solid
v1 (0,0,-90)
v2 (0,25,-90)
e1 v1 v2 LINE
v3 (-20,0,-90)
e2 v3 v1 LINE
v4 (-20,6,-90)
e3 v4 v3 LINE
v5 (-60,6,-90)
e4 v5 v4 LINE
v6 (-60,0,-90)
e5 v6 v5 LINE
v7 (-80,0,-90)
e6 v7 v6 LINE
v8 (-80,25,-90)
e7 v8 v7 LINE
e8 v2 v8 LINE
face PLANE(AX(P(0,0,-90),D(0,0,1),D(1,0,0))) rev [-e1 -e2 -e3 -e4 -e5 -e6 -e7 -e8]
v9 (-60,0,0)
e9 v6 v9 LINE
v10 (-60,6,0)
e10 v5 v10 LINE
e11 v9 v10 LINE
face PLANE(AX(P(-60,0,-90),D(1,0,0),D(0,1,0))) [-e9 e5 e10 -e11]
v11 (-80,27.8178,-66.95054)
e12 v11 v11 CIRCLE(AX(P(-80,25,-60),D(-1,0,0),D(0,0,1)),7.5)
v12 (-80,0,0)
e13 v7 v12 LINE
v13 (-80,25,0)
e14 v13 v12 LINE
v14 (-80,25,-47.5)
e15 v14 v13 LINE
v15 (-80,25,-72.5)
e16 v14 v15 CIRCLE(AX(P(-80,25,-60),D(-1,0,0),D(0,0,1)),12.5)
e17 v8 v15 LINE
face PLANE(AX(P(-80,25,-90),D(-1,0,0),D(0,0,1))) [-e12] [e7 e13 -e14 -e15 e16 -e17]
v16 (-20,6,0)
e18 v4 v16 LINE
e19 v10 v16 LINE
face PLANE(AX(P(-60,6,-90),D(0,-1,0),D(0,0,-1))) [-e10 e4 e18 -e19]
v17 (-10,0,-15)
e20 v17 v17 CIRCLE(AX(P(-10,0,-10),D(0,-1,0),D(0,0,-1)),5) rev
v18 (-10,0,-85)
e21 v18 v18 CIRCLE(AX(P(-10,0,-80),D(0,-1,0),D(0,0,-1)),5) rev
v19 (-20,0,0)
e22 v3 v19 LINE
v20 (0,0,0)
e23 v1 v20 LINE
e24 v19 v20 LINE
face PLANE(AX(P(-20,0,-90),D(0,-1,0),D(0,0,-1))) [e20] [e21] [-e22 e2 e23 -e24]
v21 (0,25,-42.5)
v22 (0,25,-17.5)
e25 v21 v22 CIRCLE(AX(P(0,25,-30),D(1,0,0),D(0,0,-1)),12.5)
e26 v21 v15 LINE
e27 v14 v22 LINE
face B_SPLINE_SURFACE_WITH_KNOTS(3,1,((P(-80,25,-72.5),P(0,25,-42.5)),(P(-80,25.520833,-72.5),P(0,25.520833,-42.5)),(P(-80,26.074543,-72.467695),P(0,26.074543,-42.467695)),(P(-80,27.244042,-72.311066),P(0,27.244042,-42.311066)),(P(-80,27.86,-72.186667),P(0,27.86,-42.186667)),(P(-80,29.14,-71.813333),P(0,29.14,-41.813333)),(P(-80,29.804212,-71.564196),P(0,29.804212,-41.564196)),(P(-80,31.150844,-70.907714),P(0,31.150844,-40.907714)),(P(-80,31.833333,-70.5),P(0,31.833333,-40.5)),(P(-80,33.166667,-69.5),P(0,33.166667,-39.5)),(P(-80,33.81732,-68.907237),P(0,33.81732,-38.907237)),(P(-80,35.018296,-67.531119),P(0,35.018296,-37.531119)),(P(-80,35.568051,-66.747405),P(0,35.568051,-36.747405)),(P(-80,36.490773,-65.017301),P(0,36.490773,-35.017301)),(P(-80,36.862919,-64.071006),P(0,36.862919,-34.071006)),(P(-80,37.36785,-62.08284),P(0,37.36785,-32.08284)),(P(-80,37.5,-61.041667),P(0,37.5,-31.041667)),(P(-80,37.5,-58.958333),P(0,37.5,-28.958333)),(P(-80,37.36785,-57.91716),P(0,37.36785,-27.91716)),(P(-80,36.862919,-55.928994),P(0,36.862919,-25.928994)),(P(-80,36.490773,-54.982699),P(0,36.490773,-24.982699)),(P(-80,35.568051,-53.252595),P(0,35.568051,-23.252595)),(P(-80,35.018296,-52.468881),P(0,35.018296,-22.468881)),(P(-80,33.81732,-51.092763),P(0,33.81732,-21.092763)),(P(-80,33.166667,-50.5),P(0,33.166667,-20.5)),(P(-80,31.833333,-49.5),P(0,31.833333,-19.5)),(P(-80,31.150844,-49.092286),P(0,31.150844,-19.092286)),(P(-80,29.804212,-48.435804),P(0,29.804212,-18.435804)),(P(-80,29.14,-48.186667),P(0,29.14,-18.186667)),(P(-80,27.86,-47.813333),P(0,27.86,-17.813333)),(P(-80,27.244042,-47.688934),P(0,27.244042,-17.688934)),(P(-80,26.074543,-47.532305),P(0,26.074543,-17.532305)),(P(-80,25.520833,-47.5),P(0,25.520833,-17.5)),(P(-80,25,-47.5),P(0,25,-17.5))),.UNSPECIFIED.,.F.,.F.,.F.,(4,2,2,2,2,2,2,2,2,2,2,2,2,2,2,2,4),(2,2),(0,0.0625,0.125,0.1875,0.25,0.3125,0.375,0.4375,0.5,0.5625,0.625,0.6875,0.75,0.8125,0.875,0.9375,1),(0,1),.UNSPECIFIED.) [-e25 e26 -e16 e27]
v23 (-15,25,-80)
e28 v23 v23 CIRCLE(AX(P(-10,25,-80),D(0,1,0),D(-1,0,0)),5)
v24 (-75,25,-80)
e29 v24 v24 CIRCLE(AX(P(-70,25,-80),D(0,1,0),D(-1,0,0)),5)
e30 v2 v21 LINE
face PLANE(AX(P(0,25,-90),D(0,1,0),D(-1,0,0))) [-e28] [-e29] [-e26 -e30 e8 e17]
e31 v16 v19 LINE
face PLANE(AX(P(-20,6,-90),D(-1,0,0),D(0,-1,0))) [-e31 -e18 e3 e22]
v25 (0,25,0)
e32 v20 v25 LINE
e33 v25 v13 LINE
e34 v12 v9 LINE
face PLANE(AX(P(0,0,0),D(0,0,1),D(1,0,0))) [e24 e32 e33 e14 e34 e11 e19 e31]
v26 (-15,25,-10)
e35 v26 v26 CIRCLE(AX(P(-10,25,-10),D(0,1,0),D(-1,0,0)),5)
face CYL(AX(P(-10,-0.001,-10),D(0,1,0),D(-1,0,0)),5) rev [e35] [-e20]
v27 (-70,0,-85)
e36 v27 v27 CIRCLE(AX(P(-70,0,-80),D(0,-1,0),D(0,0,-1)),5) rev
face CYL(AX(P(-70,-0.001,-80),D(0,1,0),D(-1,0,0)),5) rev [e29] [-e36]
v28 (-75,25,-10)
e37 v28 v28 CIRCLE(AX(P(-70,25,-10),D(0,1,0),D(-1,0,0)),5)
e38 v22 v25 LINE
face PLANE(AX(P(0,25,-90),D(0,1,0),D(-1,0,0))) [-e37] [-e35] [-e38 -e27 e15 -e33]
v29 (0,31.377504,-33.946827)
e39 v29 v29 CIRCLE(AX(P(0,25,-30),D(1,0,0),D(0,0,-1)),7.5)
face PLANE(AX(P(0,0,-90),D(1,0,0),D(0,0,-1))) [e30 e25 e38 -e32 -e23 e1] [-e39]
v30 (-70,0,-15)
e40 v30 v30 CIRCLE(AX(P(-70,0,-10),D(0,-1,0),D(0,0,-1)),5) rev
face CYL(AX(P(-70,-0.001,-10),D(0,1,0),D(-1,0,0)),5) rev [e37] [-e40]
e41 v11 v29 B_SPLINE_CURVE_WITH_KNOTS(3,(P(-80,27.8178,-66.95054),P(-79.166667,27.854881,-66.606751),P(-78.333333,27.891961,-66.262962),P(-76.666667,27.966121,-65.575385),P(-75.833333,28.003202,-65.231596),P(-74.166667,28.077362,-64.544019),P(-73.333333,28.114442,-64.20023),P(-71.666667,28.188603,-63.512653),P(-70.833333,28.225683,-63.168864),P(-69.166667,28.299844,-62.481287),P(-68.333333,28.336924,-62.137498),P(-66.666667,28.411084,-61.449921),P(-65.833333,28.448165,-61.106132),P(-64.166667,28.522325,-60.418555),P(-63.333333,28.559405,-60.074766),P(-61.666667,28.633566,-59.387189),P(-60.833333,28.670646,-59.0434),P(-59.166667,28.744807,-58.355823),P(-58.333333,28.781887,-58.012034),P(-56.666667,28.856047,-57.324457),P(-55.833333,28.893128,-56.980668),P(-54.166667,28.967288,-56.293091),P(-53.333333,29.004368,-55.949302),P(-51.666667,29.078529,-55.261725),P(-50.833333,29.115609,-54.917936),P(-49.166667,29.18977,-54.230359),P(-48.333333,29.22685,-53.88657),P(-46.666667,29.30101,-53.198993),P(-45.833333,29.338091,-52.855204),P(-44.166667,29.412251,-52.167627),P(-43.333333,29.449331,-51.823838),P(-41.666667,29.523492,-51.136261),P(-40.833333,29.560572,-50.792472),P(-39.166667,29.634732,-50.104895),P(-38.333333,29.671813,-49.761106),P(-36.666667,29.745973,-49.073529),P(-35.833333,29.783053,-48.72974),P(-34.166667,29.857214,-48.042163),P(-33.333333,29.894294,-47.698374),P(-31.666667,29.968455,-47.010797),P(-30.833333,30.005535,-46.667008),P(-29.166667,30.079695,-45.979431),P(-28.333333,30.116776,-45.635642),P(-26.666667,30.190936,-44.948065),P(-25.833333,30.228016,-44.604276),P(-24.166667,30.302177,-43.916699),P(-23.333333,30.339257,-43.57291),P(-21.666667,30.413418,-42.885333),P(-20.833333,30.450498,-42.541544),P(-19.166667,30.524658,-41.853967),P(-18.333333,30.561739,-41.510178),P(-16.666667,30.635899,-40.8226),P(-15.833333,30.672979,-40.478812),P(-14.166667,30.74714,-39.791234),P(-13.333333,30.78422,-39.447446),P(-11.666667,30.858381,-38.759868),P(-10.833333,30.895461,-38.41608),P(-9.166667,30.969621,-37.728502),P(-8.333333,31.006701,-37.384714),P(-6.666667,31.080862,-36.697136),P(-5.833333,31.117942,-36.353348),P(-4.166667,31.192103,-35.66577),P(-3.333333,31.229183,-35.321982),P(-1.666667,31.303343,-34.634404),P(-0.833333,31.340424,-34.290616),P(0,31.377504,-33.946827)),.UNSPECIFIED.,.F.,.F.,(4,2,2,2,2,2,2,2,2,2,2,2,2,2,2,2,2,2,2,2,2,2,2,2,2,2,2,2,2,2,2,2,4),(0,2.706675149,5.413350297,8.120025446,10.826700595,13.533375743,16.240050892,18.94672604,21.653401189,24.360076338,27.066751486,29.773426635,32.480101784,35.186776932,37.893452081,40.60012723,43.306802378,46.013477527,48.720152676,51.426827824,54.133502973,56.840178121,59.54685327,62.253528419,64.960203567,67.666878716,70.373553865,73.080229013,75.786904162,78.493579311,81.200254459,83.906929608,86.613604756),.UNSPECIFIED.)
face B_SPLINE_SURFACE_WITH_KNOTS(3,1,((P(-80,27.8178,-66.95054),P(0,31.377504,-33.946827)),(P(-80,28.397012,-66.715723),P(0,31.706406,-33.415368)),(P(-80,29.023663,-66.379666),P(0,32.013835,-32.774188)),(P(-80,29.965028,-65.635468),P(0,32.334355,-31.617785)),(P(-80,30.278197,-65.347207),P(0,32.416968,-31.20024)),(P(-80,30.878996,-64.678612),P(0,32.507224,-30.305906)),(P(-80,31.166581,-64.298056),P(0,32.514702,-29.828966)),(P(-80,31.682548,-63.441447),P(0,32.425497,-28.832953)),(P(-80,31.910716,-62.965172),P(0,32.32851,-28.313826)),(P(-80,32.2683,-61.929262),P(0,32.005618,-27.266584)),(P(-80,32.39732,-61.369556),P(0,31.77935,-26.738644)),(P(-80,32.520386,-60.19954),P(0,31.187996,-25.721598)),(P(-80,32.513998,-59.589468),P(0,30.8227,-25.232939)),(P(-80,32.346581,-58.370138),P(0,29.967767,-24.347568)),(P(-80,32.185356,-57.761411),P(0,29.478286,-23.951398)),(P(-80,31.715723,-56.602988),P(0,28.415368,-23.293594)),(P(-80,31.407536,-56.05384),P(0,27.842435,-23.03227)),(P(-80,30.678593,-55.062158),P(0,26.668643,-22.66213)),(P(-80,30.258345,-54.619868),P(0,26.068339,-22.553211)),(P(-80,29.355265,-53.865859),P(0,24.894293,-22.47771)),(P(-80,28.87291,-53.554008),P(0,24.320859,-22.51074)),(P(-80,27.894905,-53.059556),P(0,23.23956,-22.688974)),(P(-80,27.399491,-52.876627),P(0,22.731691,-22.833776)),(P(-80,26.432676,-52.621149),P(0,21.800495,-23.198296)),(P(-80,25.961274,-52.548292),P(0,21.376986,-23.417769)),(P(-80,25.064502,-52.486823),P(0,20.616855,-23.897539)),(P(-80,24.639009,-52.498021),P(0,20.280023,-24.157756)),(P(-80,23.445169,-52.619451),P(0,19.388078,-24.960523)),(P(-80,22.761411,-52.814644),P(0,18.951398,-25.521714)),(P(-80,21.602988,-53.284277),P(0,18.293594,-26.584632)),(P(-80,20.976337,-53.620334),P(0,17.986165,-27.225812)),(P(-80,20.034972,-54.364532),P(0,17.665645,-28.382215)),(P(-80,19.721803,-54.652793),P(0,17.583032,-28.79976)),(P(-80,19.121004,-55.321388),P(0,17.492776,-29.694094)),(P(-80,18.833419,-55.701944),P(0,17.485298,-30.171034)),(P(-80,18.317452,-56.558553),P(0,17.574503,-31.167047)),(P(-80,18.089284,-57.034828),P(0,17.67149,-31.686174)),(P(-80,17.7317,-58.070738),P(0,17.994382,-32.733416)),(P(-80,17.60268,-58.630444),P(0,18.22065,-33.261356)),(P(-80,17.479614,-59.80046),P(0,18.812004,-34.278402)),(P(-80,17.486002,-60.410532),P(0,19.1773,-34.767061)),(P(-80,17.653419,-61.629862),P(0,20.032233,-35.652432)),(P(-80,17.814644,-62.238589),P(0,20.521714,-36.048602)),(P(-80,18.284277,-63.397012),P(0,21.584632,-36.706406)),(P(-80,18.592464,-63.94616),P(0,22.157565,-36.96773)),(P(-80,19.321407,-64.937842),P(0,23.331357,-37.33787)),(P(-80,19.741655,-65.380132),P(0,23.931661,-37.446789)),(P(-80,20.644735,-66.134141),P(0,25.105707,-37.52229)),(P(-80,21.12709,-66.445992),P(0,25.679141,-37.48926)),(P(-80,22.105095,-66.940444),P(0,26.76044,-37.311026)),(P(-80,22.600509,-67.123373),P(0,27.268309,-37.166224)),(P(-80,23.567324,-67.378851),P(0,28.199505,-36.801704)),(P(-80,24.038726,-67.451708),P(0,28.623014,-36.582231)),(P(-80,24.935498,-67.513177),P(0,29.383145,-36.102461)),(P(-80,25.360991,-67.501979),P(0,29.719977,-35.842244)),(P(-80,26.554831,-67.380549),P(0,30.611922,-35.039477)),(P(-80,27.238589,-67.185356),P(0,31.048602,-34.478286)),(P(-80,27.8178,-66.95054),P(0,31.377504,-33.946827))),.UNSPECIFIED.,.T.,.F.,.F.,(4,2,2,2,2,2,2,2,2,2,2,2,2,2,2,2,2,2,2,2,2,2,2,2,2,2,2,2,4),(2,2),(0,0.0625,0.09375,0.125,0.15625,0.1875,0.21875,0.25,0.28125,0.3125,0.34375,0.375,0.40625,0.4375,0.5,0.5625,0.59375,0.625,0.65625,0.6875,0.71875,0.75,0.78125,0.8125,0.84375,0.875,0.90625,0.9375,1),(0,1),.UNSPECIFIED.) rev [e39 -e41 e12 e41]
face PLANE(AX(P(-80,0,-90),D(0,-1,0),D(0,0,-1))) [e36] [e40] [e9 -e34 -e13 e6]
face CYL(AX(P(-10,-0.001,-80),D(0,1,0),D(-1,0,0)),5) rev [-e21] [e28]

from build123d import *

# Parameters (mm, degrees)
SALIENTE_EXTRUIR1_DEPTH = 90
CORTAR_EXTRUIR1_REACH   = 124.984
CROQUIS3_R              = 5


with BuildPart() as part:
    # Croquis2 → Saliente-Extruir1 (new body)
    with BuildSketch(Plane.XY):
        Polygon((0, 0), (0, 25), (-80, 25), (-80, 0), (-60, 0), (-60, 6), (-20, 6), (-20, 0), align=None)
    extrude(amount=-SALIENTE_EXTRUIR1_DEPTH)

    # Croquis3 → Cortar-Extruir1 (cut, up to next)
    with BuildSketch(Plane(origin=(0, 25, 0), x_dir=(1, 0, 0), z_dir=(0, 1, 0)), mode=Mode.PRIVATE) as cortar_extruir1_sk1:
        with Locations(Location((-70, 80, 0), (0, 0, 180))):
            Circle(CROQUIS3_R)
    cortar_extruir1_tool1 = extrude(cortar_extruir1_sk1.sketch, amount=-CORTAR_EXTRUIR1_REACH, mode=Mode.PRIVATE) & part.part
    # Croquis3 → Cortar-Extruir1 (cut, up to next)
    with BuildSketch(Plane(origin=(0, 25, 0), x_dir=(1, 0, 0), z_dir=(0, 1, 0)), mode=Mode.PRIVATE) as cortar_extruir1_sk2:
        with Locations(Location((-10, 80, 0), (0, 0, 180))):
            Circle(CROQUIS3_R)
    cortar_extruir1_tool2 = extrude(cortar_extruir1_sk2.sketch, amount=-CORTAR_EXTRUIR1_REACH, mode=Mode.PRIVATE) & part.part
    # Croquis3 → Cortar-Extruir1 (cut, up to next)
    with BuildSketch(Plane(origin=(0, 25, 0), x_dir=(1, 0, 0), z_dir=(0, 1, 0)), mode=Mode.PRIVATE) as cortar_extruir1_sk3:
        with Locations(Location((-10, 10, 0), (0, 0, 180))):
            Circle(CROQUIS3_R)
    cortar_extruir1_tool3 = extrude(cortar_extruir1_sk3.sketch, amount=-CORTAR_EXTRUIR1_REACH, mode=Mode.PRIVATE) & part.part
    # Croquis3 → Cortar-Extruir1 (cut, up to next)
    with BuildSketch(Plane(origin=(0, 25, 0), x_dir=(1, 0, 0), z_dir=(0, 1, 0)), mode=Mode.PRIVATE) as cortar_extruir1_sk4:
        with Locations(Location((-70, 10, 0), (0, 0, 180))):
            Circle(CROQUIS3_R)
    cortar_extruir1_tool4 = extrude(cortar_extruir1_sk4.sketch, amount=-CORTAR_EXTRUIR1_REACH, mode=Mode.PRIVATE) & part.part
    add(cortar_extruir1_tool1.solids().sort_by_distance((-70, 25, -80))[0], mode=Mode.SUBTRACT)
    add(cortar_extruir1_tool2.solids().sort_by_distance((-10, 25, -80))[0], mode=Mode.SUBTRACT)
    add(cortar_extruir1_tool3.solids().sort_by_distance((-10, 25, -10))[0], mode=Mode.SUBTRACT)
    add(cortar_extruir1_tool4.solids().sort_by_distance((-70, 25, -10))[0], mode=Mode.SUBTRACT)

    # Croquis5 → Recubrir1 section 0
    with BuildSketch(Plane.ZY.offset(80)):
        with BuildLine():
            Line((-72.5, 25), (-47.5, 25))
            ThreePointArc((-47.5, 25), (-60, 37.5), (-72.5, 25))
        make_face()
    # Croquis4 → Recubrir1 section 1
    with BuildSketch(Plane(origin=(0, 0, 0), x_dir=(0, 0, -1), z_dir=(1, 0, 0))):
        with BuildLine():
            Line((42.5, 25), (17.5, 25))
            ThreePointArc((17.5, 25), (30, 37.5), (42.5, 25))
        make_face()
    loft()

    # Cortar-Recubrir1: read off the stored shape, not the designer's step
    # Cortar-Recubrir1: loft between two sections, ruled curve by curve
    cortar_recubrir1_from = [
        Edge.make_bspline([(-80, 27.8178005, -66.950539572), (-80, 28.397012131, -66.715722864), (-80, 29.023662616, -66.379666069), (-80, 29.965028032, -65.63546774), (-80, 30.27819737, -65.347207423), (-80, 30.878995513, -64.678611595), (-80, 31.166580719, -64.298055634), (-80, 31.682547567, -63.441447082), (-80, 31.910716085, -62.965172363), (-80, 32.268300366, -61.929262486), (-80, 32.397319654, -61.369555656), (-80, 32.520385943, -60.19953953), (-80, 32.51399771, -59.589467861), (-80, 32.346580783, -58.370138344), (-80, 32.18535628, -57.761411131), (-80, 31.715722864, -56.602987869), (-80, 31.407536262, -56.053840186), (-80, 30.678592509, -55.062157825), (-80, 30.258345404, -54.619867625), (-80, 29.355265136, -53.865858955), (-80, 28.87290981, -53.554007946), (-80, 27.894905327, -53.059555699), (-80, 27.399490807, -52.876626932), (-80, 26.43267588, -52.621149153), (-80, 25.961273747, -52.548292311), (-80, 25.064501609, -52.486822627), (-80, 24.639009381, -52.49802121), (-80, 23.44516904, -52.619451193), (-80, 22.761411131, -52.81464372), (-80, 21.602987869, -53.284277136), (-80, 20.976337384, -53.620333931), (-80, 20.034971968, -54.36453226), (-80, 19.72180263, -54.652792577), (-80, 19.121004487, -55.321388405), (-80, 18.833419281, -55.701944366), (-80, 18.317452433, -56.558552918), (-80, 18.089283915, -57.034827637), (-80, 17.731699634, -58.070737514), (-80, 17.602680346, -58.630444344), (-80, 17.479614057, -59.80046047), (-80, 17.48600229, -60.410532139), (-80, 17.653419217, -61.629861656), (-80, 17.81464372, -62.238588869), (-80, 18.284277136, -63.397012131), (-80, 18.592463738, -63.946159814), (-80, 19.321407491, -64.937842175), (-80, 19.741654596, -65.380132375), (-80, 20.644734864, -66.134141045), (-80, 21.12709019, -66.445992054), (-80, 22.105094673, -66.940444301), (-80, 22.600509193, -67.123373068), (-80, 23.56732412, -67.378850847), (-80, 24.038726253, -67.451707689), (-80, 24.935498391, -67.513177373), (-80, 25.360990619, -67.50197879), (-80, 26.55483096, -67.380548807), (-80, 27.238588869, -67.18535628), (-80, 27.8178005, -66.950539572)], [0, 0, 0, 0, 0.0625, 0.0625, 0.09375, 0.09375, 0.125, 0.125, 0.15625, 0.15625, 0.1875, 0.1875, 0.21875, 0.21875, 0.25, 0.25, 0.28125, 0.28125, 0.3125, 0.3125, 0.34375, 0.34375, 0.375, 0.375, 0.40625, 0.40625, 0.4375, 0.4375, 0.5, 0.5, 0.5625, 0.5625, 0.59375, 0.59375, 0.625, 0.625, 0.65625, 0.65625, 0.6875, 0.6875, 0.71875, 0.71875, 0.75, 0.75, 0.78125, 0.78125, 0.8125, 0.8125, 0.84375, 0.84375, 0.875, 0.875, 0.90625, 0.90625, 0.9375, 0.9375, 1, 1, 1, 1], 3),
    ]
    cortar_recubrir1_to = [
        Edge.make_bspline([(0, 31.377503921, -33.946827047), (0, 31.706406175, -33.415368387), (0, 32.013835032, -32.774187836), (0, 32.33435549, -31.617785382), (0, 32.416968296, -31.200239973), (0, 32.507224255, -30.305906337), (0, 32.514702079, -29.828965909), (0, 32.425496651, -28.83295266), (0, 32.328510244, -28.313826359), (0, 32.005617859, -27.266584123), (0, 31.779349551, -26.738644387), (0, 31.187995987, -25.721597678), (0, 30.822699703, -25.232939438), (0, 29.967766964, -24.347567814), (0, 29.478285707, -23.951398333), (0, 28.415368387, -23.293593825), (0, 27.84243548, -23.032270186), (0, 26.668642711, -22.662130437), (0, 26.06833886, -22.553210568), (0, 24.894293414, -22.477709998), (0, 24.320859272, -22.510740236), (0, 23.239559888, -22.688974452), (0, 22.73169069, -22.833775549), (0, 21.800495492, -23.198296471), (0, 21.37698638, -23.417768843), (0, 20.616854994, -23.897538648), (0, 20.280022745, -24.15775602), (0, 19.388077935, -24.960522771), (0, 18.951398333, -25.521714293), (0, 18.293593825, -26.584631613), (0, 17.986164968, -27.225812164), (0, 17.66564451, -28.382214618), (0, 17.583031704, -28.799760027), (0, 17.492775745, -29.694093663), (0, 17.485297921, -30.171034091), (0, 17.574503349, -31.16704734), (0, 17.671489756, -31.686173641), (0, 17.994382141, -32.733415877), (0, 18.220650449, -33.261355613), (0, 18.812004013, -34.278402322), (0, 19.177300297, -34.767060562), (0, 20.032233036, -35.652432186), (0, 20.521714293, -36.048601667), (0, 21.584631613, -36.706406175), (0, 22.15756452, -36.967729814), (0, 23.331357289, -37.337869563), (0, 23.93166114, -37.446789432), (0, 25.105706586, -37.522290002), (0, 25.679140728, -37.489259764), (0, 26.760440112, -37.311025548), (0, 27.26830931, -37.166224451), (0, 28.199504508, -36.801703529), (0, 28.62301362, -36.582231157), (0, 29.383145006, -36.102461352), (0, 29.719977255, -35.84224398), (0, 30.611922065, -35.039477229), (0, 31.048601667, -34.478285707), (0, 31.377503921, -33.946827047)], [0, 0, 0, 0, 0.0625, 0.0625, 0.09375, 0.09375, 0.125, 0.125, 0.15625, 0.15625, 0.1875, 0.1875, 0.21875, 0.21875, 0.25, 0.25, 0.28125, 0.28125, 0.3125, 0.3125, 0.34375, 0.34375, 0.375, 0.375, 0.40625, 0.40625, 0.4375, 0.4375, 0.5, 0.5, 0.5625, 0.5625, 0.59375, 0.59375, 0.625, 0.625, 0.65625, 0.65625, 0.6875, 0.6875, 0.71875, 0.71875, 0.75, 0.75, 0.78125, 0.78125, 0.8125, 0.8125, 0.84375, 0.84375, 0.875, 0.875, 0.90625, 0.90625, 0.9375, 0.9375, 1, 1, 1, 1], 3),
    ]
    cortar_recubrir1 = Solid(Shell([*[Face.make_surface_from_curves(cortar_recubrir1_from[k], cortar_recubrir1_to[k]) for k in range(1)], Face(Wire(cortar_recubrir1_from)), Face(Wire(cortar_recubrir1_to))]))
    add(cortar_recubrir1, mode=Mode.SUBTRACT)


solid = part.part
